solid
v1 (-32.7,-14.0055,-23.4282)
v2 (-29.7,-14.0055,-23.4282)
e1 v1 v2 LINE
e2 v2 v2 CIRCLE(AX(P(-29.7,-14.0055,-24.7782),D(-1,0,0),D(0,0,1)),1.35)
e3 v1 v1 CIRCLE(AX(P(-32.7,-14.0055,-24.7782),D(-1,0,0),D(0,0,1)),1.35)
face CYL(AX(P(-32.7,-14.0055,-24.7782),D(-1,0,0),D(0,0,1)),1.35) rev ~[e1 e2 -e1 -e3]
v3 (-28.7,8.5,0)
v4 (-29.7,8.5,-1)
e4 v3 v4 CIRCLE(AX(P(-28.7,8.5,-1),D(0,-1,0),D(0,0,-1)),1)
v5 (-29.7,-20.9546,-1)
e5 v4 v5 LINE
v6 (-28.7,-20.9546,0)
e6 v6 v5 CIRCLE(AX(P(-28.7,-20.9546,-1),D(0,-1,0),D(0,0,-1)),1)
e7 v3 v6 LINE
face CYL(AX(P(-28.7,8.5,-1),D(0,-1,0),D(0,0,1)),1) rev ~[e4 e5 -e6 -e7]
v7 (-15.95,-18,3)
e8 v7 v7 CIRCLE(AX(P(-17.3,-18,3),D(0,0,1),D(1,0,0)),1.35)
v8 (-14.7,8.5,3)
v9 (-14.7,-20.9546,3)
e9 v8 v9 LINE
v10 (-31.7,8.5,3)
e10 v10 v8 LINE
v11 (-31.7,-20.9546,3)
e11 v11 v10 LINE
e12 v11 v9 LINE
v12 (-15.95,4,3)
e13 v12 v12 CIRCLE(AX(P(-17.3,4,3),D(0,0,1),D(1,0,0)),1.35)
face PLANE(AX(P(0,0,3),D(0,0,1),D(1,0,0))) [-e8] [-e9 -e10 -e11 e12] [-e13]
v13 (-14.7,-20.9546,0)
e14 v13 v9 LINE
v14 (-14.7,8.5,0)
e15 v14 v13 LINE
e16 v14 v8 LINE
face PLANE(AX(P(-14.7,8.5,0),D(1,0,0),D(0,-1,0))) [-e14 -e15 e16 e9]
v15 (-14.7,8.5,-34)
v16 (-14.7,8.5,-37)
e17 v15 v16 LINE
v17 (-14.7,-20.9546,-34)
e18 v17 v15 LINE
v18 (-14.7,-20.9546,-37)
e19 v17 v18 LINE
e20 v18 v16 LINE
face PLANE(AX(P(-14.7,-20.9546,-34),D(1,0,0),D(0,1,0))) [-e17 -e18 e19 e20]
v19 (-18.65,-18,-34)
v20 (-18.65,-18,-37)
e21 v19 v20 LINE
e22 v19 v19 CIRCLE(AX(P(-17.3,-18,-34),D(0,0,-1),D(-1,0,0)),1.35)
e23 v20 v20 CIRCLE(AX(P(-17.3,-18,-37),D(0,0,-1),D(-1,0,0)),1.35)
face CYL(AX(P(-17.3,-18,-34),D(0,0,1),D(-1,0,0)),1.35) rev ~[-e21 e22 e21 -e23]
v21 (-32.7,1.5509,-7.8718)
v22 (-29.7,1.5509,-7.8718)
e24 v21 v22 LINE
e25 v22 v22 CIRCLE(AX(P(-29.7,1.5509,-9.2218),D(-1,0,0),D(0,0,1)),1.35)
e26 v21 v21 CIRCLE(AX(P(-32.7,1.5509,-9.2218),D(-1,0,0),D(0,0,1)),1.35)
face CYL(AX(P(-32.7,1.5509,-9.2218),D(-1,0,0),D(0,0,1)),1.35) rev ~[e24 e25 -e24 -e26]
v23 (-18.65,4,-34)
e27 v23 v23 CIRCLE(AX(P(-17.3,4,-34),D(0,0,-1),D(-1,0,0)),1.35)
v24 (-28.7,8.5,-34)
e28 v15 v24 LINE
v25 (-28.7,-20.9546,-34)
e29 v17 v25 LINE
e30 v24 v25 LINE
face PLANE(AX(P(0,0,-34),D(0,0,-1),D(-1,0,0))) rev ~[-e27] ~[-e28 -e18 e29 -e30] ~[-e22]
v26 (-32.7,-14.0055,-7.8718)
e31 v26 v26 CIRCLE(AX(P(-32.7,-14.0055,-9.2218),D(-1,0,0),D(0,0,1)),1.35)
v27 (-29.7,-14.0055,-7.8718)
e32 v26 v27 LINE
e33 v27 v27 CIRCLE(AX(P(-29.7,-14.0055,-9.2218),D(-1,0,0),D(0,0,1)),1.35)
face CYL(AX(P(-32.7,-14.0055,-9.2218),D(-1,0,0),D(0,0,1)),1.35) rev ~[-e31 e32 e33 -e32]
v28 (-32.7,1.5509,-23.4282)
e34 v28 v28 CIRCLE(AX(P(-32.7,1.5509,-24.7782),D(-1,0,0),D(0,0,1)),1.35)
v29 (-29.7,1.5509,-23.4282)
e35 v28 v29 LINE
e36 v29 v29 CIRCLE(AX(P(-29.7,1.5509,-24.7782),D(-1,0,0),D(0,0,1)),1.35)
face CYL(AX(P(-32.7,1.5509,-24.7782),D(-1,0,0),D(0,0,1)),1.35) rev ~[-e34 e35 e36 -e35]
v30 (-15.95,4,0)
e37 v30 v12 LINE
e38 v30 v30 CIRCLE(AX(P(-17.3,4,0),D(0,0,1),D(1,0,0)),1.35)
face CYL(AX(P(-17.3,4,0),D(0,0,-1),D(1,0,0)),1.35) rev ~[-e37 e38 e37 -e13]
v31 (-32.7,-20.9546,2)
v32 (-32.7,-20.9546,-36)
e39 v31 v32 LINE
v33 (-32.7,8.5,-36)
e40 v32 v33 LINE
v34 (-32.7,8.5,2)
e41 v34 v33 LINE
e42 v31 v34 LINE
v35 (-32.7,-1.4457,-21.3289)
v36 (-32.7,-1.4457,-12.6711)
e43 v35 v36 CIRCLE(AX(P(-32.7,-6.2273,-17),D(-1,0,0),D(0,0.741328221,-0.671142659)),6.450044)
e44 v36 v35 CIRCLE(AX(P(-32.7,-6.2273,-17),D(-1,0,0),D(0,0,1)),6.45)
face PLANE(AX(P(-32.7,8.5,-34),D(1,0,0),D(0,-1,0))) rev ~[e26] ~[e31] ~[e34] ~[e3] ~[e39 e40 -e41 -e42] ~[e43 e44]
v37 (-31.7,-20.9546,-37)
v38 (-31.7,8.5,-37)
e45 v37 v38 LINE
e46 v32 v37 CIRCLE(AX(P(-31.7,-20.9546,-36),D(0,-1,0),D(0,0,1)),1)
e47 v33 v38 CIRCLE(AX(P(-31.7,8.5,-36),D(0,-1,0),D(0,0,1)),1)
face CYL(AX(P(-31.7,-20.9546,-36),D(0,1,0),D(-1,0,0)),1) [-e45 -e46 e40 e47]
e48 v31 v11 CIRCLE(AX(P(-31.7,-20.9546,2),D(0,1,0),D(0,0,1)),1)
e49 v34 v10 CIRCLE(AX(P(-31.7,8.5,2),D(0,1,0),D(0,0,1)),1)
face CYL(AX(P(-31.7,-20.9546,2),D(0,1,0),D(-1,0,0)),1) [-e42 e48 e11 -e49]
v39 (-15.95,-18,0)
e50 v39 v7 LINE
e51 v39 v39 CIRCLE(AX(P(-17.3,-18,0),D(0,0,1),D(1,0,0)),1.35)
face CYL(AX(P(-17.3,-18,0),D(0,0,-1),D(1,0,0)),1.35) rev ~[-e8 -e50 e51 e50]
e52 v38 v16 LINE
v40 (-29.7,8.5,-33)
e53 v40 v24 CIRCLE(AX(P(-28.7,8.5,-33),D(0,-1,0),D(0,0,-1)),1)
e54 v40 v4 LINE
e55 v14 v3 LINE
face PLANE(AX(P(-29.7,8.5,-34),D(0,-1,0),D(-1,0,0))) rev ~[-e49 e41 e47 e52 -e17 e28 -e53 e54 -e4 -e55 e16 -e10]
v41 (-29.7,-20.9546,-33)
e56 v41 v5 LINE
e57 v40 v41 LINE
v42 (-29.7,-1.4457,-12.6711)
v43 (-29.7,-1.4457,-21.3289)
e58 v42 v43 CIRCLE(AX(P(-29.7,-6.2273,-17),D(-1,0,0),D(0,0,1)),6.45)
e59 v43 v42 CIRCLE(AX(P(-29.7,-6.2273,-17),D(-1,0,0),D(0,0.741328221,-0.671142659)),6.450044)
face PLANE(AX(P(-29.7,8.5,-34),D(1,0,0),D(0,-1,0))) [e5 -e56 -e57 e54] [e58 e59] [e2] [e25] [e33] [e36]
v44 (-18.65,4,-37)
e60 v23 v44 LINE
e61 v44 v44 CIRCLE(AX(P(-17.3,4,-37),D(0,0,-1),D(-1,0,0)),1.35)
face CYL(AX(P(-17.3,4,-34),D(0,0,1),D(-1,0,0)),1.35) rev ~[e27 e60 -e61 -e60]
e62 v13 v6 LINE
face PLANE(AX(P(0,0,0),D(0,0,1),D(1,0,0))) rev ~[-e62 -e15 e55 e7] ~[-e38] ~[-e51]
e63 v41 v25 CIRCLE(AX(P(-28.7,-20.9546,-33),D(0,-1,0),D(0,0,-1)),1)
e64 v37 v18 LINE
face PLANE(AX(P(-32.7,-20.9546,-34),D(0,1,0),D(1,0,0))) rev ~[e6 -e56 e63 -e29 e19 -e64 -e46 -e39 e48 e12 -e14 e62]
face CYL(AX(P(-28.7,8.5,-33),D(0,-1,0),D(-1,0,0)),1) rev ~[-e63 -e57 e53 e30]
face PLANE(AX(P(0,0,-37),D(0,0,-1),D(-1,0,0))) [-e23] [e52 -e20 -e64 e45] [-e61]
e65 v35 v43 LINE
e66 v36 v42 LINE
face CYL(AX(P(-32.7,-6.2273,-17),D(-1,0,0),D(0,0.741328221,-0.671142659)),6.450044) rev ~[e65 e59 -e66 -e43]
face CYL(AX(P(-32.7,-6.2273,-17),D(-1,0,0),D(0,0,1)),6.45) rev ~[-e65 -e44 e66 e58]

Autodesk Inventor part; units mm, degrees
ref_plane "YZ Plane" through (0, 0, 0) normal (1, 0, 0) x (0, 1, 0)
ref_plane "XZ Plane" through (0, 0, 0) normal (0, 1, 0) x (-1, 0, 0)
ref_plane "XY Plane" through (0, 0, 0) normal (0, 0, 1) x (1, 0, 0)
ref_plane "작업 평면1" through (0, 0, -34) normal (0, 0, -1) x (-1, 0, 0)
sketch "스케치1" plane through (0, 0, -34) normal (0, 0, -1) x (-1, 0, 0)
  circle A0 centre (17.3, -18) radius 1.35 projected
  line L0 (20.1, -44.6) -> (20.1, 8.5) projected
  line L1 (14.5, -42) -> (14.5, 11.5) projected
  circle A1 centre (17.3, 4) radius 1.35 projected
  circle A2 centre (17.3, -18) radius 1.45
  circle A3 centre (17.3, 4) radius 1.45
  line L2 (14.7, -42) -> (14.7, 11.5)
  line L3 (14.7, 11.5) -> (20.1, 8.5)
  line L4 (14.7, -20.9546) -> (32.7, -20.9546)
  line L5 (32.7, -20.9546) -> (32.7, 8.5)
  line L6 (32.7, 8.5) -> (20.1, 8.5)
  line L7 (32.7, -20.9546) -> (26.7, -20.9546)
  line L8 (26.7, -20.9546) -> (26.7, 8.5)
  line L9 (26.7, 8.5) -> (32.7, 8.5)
  line L10 (32.7, 8.5) -> (32.7, -20.9546)
  line L11 (20.1, 8.5) -> (14.7, 8.5)
  point P0 (0, 0)
  dimension "d0" = 0.1
  dimension "d1" = 0.1
  dimension "d2" = 0.2
  dimension "d3" = 18
  dimension "d8" = 6
extrude "돌출1" add sketch "스케치1" along normal blind 3 contours L4 L2 L11 L0 | L0 L6 L8 L4 | L8 L6 L5 L4 | A2 | A3
sketch "스케치2" plane through (0, 0, -34) normal (0, 0, 1) x (1, 0, 0)
  line L0 (-20.1, 8.5) -> (-14.7, 11.5) projected
  line L1 (-14.7, 8.5) -> (-14.7, -20.9546) projected
  line L2 (-20.1, -44.6) -> (-20.1, 8.5) projected
  line L3 (-32.7, 8.5) -> (-14.7, 8.5) projected
  line L4 (-32.7, -20.9546) -> (-32.7, 8.5) projected
  line L5 (-14.7, -20.9546) -> (-32.7, -20.9546) projected
  line L6 (-20.1, -20.9546) -> (-32.7, -20.9546)
  line L7 (-32.7, -20.9546) -> (-32.7, 8.5)
  line L8 (-32.7, 8.5) -> (-20.1, 8.5)
  line L9 (-20.1, 8.5) -> (-20.1, -20.9546)
  line L10 (-20.1, -20.9546) -> (-14.7, -20.9546)
  line L11 (-14.7, 11.5) -> (-20.1, 8.5)
  circle A0 centre (-17.3, -18) radius 1.45 projected
  circle A1 centre (-17.3, 4) radius 1.35 projected
  circle A2 centre (-17.3, 4) radius 1.45 projected
  circle A3 centre (-17.3, 4) radius 1.45
  circle A4 centre (-17.3, -18) radius 1.45
  point P0 (0, 0)
ref_plane "작업 평면2" through (0, 0, 0) normal (0, 0, 1) x (1, 0, 0)
sketch "스케치3" plane through (0, 0, 0) normal (0, 0, 1) x (1, 0, 0)
  line L0 (-32.7, 8.5) -> (-14.7, 8.5) projected
  line L1 (-32.7, -20.9546) -> (-32.7, 8.5) projected
  line L2 (-14.7, -20.9546) -> (-32.7, -20.9546) projected
  line L3 (-14.7, 8.5) -> (-14.7, -20.9546) projected
  line L4 (-20.1, -20.9546) -> (-32.7, -20.9546)
  line L5 (-32.7, -20.9546) -> (-32.7, 8.5)
  line L6 (-32.7, 8.5) -> (-20.1, 8.5)
  line L7 (-20.1, 8.5) -> (-20.1, -20.9546)
  line L8 (-32.7, -20.9546) -> (-20.1, -20.9546)
  line L9 (-20.1, -20.9546) -> (-20.1, 8.5)
  line L10 (-20.1, 8.5) -> (-32.7, 8.5)
  line L11 (-32.7, 8.5) -> (-32.7, -20.9546)
  line L12 (-20.1, -20.9546) -> (-14.7, -20.9546)
  line L13 (-14.7, 8.5) -> (-14.7, -20.9546) projected
  line L14 (-14.7, 11.5) -> (-20.1, 8.5)
  circle A0 centre (-17.3, -18) radius 1.45
  circle A1 centre (-17.3, 4) radius 1.45
  circle A2 centre (-17.3, 4) radius 1.35
  circle A3 centre (-17.3, -18) radius 1.35
  point P0 (0, 0)
  dimension "d26" = 2.7
  dimension "d27" = 2.7
extrude "돌출2" add sketch "스케치3" along normal blind 3 contours L0 L7 L2 L1 | L0 L3 L2 L7 | A0 | A1
sketch "스케치4" plane through (0, 0, -34) normal (0, 0, 1) x (1, 0, 0)
  line L0 (-14.7, -20.9546) -> (-14.7, 8.5) projected
  line L1 (-14.7, 8.5) -> (-32.7, 8.5) projected
  line L2 (-32.7, 8.5) -> (-32.7, -20.9546) projected
  line L3 (-32.7, -20.9546) -> (-14.7, -20.9546) projected
  line L4 (-32.7, 8.5) -> (-26.7, 8.5)
  line L5 (-26.7, -20.9546) -> (-32.7, -20.9546)
  line L6 (-32.7, -20.9546) -> (-32.7, 8.5)
  line L7 (-32.7, 8.5) -> (-29.7, 8.5)
  line L8 (-29.7, 8.5) -> (-29.7, -20.9546)
  line L9 (-29.7, -20.9546) -> (-32.7, -20.9546)
  line L10 (-32.7, -20.9546) -> (-32.7, 8.5)
  point P0 (0, 0)
  point P1 (-29.7, -20.9546)
extrude "돌출3" add sketch "스케치4" along normal up to surface (34 mm away) contours L3 L2 L1 L8
sketch "스케치5" plane through (-32.7, -20.9546, -37) normal (-1, 0, 0) x (0, 0, 1)
  line L0 (40, 29.4546) -> (0, 29.4546) projected
  line L1 (0, 0) -> (0, 29.4546) projected
  line L2 (40, 0) -> (0, 0) projected
  line L3 (40, 29.4546) -> (40, 0) projected
  line L4 (40, 0) -> (0, 0) projected
  circle A0 centre (20, 14.7273) radius 14
  arc A1 (15, 20.2502) -> (25, 20.2502) centre (20, 14.7273) ccw
  circle A2 centre (20, 14.7273) radius 1.6
  circle A3 centre (12.2218, 22.5055) radius 1.35
  circle A4 centre (27.7782, 22.5055) radius 1.35
  circle A5 centre (27.7782, 6.9491) radius 1.35
  circle A6 centre (12.2218, 6.9491) radius 1.35
  arc A7 (15.6711, 19.5089) -> (24.3289, 19.5089) centre (20, 14.7273) ccw
  circle A8 centre (20, 14.7273) radius 6.45
  point P0 (37, 20.9546)
  point P1 (24.3289, 19.5089)
  point P2 (15.6711, 19.5089)
  dimension "d20" = 3.2
  dimension "d21" = 2.7
  dimension "d22" = 2.7
  dimension "d23" = 2.7
  dimension "d24" = 2.7
  dimension "d25" = 1
extrude "돌출4" cut sketch "스케치5" against normal blind 10 contours A2 | A3 | A4 | A5 | A6 | A8 A7
fillet "모깎기1" radius 1 4 edges at (-32.7, -6.2273, 3) (-32.7, -6.2273, -37) (-29.7, -6.2273, -34) (-29.7, -6.2273, 0)
properties part number "3D_pelvis2" material "PMMA 플라스틱"
